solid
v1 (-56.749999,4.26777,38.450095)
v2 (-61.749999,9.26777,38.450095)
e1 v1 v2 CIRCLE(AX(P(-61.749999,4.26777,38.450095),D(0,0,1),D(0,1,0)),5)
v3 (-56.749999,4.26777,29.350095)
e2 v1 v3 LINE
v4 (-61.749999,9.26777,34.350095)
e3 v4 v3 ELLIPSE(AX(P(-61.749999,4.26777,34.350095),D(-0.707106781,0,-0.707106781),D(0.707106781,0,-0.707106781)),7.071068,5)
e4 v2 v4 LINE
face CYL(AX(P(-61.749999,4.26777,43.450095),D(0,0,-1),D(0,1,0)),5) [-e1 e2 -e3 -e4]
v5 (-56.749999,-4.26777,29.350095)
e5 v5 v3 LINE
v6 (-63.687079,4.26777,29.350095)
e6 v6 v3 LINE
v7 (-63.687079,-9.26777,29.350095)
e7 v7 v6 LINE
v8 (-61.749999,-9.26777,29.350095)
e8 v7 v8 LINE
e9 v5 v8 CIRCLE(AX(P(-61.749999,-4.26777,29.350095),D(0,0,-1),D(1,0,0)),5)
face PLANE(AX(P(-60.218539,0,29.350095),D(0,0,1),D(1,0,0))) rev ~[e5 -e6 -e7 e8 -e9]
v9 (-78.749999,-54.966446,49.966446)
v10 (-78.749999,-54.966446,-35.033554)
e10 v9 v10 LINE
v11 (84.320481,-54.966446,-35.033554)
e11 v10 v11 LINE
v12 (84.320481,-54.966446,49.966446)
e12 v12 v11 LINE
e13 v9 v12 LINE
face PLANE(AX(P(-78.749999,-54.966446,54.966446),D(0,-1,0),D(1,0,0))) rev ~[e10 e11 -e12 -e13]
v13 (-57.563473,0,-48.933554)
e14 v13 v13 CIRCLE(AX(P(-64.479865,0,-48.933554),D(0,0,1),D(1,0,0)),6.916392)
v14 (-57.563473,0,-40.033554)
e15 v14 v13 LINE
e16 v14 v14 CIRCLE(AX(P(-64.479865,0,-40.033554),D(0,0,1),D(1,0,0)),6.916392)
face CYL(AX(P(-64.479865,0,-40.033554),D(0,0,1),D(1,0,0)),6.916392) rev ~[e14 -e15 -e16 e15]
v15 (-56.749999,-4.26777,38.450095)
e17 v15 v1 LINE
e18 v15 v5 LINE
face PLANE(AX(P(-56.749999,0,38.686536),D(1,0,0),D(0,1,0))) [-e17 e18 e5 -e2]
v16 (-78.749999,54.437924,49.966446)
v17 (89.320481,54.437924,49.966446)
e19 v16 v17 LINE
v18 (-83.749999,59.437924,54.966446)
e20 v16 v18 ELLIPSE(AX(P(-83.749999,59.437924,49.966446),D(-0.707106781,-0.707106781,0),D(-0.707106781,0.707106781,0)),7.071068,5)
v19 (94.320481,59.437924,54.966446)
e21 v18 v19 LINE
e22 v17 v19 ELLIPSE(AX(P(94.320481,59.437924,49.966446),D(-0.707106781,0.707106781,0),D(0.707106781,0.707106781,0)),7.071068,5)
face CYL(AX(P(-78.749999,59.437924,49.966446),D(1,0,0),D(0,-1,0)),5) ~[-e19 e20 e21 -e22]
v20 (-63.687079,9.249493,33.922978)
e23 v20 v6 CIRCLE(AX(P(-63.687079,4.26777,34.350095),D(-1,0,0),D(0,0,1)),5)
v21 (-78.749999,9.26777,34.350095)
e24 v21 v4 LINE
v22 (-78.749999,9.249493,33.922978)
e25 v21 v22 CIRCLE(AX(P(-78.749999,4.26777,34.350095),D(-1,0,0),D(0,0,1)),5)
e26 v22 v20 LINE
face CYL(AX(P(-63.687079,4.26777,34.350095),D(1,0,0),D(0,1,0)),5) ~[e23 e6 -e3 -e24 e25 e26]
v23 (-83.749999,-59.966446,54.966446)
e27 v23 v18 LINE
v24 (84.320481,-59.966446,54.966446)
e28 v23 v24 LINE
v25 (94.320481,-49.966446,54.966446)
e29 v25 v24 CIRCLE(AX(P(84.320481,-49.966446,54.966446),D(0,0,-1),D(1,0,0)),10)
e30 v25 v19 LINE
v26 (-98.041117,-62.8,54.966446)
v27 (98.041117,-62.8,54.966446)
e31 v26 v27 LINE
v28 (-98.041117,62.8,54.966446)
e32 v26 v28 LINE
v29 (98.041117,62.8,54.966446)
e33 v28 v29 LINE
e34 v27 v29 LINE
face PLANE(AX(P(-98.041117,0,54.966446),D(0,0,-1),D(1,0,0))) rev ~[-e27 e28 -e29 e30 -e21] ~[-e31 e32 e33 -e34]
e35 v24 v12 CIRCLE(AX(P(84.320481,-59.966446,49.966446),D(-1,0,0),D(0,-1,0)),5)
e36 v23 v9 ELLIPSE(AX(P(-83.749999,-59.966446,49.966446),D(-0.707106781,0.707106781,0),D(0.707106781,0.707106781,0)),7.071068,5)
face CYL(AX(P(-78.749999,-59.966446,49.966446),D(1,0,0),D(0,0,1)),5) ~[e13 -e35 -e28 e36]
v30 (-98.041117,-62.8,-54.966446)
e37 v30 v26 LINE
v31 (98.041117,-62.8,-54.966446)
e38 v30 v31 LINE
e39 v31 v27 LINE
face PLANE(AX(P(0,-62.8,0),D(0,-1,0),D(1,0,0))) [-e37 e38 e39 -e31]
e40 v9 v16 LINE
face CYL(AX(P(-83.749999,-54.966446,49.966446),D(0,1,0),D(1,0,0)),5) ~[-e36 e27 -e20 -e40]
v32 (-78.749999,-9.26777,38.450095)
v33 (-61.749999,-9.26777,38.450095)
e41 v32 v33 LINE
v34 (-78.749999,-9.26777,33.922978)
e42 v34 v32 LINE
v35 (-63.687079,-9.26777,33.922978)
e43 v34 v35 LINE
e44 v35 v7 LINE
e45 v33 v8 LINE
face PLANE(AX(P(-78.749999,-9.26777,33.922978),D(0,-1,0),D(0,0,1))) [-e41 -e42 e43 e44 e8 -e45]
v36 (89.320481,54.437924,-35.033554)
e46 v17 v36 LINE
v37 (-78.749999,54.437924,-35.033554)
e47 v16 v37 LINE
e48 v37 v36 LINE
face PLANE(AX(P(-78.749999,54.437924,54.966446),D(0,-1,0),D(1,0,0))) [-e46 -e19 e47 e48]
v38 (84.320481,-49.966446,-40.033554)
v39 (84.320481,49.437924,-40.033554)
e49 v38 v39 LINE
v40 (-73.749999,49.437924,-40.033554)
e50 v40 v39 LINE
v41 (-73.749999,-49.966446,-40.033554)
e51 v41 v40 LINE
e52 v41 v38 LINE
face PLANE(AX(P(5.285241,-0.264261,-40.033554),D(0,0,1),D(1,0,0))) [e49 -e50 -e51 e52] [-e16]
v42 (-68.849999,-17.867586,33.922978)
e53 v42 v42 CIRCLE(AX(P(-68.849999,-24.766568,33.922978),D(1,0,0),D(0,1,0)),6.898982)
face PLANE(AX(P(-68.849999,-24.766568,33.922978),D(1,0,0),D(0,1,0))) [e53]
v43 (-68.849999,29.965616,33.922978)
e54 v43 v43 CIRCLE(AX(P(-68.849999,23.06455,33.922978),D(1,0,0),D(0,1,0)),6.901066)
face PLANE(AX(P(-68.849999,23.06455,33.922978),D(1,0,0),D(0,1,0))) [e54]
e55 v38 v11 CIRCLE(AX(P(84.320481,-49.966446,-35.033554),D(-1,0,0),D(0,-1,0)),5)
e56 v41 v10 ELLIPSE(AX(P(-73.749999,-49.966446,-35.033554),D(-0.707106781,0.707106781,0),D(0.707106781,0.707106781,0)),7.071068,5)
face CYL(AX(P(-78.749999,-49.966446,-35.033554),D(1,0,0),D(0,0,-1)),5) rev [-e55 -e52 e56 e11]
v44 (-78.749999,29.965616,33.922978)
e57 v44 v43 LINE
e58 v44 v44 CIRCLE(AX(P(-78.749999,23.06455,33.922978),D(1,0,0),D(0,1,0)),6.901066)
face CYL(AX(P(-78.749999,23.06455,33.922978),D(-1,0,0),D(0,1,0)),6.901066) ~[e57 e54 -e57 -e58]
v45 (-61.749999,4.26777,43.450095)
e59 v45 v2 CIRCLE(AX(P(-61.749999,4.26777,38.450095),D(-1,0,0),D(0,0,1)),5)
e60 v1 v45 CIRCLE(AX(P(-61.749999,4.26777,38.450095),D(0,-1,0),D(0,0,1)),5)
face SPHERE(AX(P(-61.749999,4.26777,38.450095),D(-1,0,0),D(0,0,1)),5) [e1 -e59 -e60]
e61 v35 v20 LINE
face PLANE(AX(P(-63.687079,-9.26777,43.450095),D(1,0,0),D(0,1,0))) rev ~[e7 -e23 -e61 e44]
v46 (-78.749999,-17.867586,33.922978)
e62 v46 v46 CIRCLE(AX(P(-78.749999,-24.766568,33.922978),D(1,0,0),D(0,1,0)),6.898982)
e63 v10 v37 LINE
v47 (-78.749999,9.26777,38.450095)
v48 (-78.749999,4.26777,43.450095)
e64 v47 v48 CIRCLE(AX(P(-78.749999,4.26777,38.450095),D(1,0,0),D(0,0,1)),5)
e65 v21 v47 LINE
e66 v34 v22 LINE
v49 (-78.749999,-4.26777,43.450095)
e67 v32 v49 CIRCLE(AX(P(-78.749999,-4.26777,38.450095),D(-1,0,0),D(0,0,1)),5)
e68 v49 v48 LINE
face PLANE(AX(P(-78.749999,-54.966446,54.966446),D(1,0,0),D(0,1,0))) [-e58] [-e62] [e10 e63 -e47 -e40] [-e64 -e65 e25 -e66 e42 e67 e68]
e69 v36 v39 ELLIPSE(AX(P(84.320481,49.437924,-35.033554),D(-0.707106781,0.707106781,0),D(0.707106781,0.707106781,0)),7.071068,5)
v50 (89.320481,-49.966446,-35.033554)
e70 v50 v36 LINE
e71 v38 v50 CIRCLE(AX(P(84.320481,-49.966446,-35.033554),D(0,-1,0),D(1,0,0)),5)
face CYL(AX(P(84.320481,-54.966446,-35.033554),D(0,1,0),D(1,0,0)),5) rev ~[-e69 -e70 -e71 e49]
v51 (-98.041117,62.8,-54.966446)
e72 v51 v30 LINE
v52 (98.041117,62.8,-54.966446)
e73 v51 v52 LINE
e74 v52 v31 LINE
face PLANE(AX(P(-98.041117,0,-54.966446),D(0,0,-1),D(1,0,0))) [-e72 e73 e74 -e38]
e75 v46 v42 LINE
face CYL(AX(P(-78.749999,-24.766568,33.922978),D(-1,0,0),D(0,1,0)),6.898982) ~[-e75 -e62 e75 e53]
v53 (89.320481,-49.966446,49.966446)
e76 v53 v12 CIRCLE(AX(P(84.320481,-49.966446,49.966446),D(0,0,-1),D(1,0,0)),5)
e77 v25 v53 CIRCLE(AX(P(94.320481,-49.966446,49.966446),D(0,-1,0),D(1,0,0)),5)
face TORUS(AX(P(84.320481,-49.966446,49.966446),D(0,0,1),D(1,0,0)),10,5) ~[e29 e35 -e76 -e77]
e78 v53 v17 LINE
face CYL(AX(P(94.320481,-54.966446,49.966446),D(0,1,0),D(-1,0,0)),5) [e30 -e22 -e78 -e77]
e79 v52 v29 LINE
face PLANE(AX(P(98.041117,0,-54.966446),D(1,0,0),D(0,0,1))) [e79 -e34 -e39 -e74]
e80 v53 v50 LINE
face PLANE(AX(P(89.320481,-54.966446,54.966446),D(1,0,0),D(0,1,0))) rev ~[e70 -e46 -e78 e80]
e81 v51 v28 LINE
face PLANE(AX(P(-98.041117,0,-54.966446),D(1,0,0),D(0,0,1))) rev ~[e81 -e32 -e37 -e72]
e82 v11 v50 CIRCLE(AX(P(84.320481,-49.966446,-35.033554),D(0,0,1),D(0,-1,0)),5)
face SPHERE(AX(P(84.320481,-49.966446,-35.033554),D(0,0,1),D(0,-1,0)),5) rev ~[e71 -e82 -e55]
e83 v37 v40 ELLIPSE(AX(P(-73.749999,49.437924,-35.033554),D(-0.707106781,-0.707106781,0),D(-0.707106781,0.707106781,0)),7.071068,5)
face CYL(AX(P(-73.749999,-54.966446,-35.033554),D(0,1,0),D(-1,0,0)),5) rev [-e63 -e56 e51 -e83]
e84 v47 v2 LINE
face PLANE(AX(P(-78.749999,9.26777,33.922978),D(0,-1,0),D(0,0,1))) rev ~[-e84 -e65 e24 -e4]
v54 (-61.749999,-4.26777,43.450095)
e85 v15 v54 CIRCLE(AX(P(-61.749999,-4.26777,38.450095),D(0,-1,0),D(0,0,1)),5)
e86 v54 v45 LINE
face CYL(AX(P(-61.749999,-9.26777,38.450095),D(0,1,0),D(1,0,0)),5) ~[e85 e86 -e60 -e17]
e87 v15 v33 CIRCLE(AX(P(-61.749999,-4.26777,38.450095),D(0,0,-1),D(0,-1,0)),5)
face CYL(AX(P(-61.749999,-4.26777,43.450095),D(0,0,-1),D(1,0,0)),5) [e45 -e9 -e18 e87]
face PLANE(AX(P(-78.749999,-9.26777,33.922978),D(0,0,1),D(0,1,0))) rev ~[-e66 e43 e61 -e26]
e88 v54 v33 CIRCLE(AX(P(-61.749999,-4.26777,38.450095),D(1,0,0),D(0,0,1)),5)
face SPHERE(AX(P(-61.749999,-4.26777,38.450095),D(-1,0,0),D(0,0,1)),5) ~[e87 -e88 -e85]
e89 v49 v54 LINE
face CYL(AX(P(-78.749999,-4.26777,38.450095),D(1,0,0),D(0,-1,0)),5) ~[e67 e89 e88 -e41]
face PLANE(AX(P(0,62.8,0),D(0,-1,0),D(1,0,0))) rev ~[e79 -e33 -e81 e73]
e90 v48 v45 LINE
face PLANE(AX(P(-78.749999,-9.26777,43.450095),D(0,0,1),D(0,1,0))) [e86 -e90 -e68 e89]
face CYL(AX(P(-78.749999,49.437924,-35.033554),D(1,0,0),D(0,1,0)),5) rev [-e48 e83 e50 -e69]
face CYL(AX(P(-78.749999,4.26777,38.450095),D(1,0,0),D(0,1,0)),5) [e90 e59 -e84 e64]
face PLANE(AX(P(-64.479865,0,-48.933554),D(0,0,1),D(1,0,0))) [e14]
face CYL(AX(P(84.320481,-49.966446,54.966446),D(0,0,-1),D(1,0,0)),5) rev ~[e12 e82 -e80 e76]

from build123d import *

# Parameters (mm, degrees)
F0_W      = 196.0822343826
F0_H      = 109.9328920245
F1_DEPTH  = 62.8
F2_W      = 168.0704802275
F2_H      = 109.4043701887
F3_DEPTH  = 95
F4_R      = 6.9163922732
F5_DEPTH  = 8.9
F6_W      = 18.5355395079
F6_H      = 9.5271170139
F7_DEPTH  = 22
F8_W      = 6.9370792508
F8_H      = 18.5355395079
F9_DEPTH  = 14.1
F10_R     = 5
F11_R     = 6.8989817164
F11_R_2   = 6.9010656104
F12_DEPTH = 9.9


with BuildPart() as f1:
    # F0 (on Front) → F1 (new body, symmetric)
    with BuildSketch(Plane.XZ):
        Rectangle(F0_W, F0_H)
    extrude(amount=F1_DEPTH, both=True)

    # F2 (on face) → F3 (cut)
    with BuildSketch(Plane.XY.offset(54.9664460123)):
        with Locations((5.2852407098, -0.2642609179)):
            Rectangle(F2_W, F2_H)
    extrude(amount=-F3_DEPTH, mode=Mode.SUBTRACT)

    # F4 (on face) → F5 (cut)
    with BuildSketch(Plane.XY.offset(-40.0335539877)):
        with Locations((-64.4798651338, 0)):
            Circle(F4_R)
    extrude(amount=-F5_DEPTH, mode=Mode.SUBTRACT)

    # F6 (on face) → F7 (join)
    with BuildSketch(Plane.YZ.offset(-78.749999404)):
        with Locations((0, 38.6865362525)):
            Rectangle(F6_W, F6_H)
    extrude(amount=F7_DEPTH)

    # F8 (on face) → F9 (join)
    with BuildSketch(Plane.XY.offset(43.4500947595)):
        with Locations((-60.2185390294, 0)):
            Rectangle(F8_W, F8_H)
    extrude(amount=-F9_DEPTH)

    # F10
    f10_edges = [f1.edges().sort_by_distance(p)[0] for p in [
        (5.285241, -54.966446, 54.966446),
        (89.320481, -54.966446, 7.466446),
        (5.285241, -54.966446, -40.033554),
        (-67.749999, 9.26777, 43.450095),
        (-67.749999, -9.26777, 43.450095),
        (-56.749999, 0, 43.450095),
        (-60.218539, 9.26777, 29.350095),
        (-56.749999, -9.26777, 36.400095),
        (-78.749999, -0.264261, 54.966446),
        (5.285241, 54.437924, 54.966446),
        (-78.749999, -0.264261, -40.033554),
        (5.285241, 54.437924, -40.033554),
        (89.320481, -0.264261, -40.033554),
        (-56.749999, 9.26777, 36.400095),
        (89.320481, -0.264261, 54.966446),
    ]]
    fillet(f10_edges, radius=F10_R)

    # F11 (on face) → F12 (join)
    with BuildSketch(Plane.YZ.offset(-78.749999404)):
        with Locations((-24.7665680945, 33.9229777455)):
            Circle(F11_R)
        with Locations((23.0645500124, 33.9229777455)):
            Circle(F11_R_2)
    extrude(amount=F12_DEPTH)


solid = f1.part
